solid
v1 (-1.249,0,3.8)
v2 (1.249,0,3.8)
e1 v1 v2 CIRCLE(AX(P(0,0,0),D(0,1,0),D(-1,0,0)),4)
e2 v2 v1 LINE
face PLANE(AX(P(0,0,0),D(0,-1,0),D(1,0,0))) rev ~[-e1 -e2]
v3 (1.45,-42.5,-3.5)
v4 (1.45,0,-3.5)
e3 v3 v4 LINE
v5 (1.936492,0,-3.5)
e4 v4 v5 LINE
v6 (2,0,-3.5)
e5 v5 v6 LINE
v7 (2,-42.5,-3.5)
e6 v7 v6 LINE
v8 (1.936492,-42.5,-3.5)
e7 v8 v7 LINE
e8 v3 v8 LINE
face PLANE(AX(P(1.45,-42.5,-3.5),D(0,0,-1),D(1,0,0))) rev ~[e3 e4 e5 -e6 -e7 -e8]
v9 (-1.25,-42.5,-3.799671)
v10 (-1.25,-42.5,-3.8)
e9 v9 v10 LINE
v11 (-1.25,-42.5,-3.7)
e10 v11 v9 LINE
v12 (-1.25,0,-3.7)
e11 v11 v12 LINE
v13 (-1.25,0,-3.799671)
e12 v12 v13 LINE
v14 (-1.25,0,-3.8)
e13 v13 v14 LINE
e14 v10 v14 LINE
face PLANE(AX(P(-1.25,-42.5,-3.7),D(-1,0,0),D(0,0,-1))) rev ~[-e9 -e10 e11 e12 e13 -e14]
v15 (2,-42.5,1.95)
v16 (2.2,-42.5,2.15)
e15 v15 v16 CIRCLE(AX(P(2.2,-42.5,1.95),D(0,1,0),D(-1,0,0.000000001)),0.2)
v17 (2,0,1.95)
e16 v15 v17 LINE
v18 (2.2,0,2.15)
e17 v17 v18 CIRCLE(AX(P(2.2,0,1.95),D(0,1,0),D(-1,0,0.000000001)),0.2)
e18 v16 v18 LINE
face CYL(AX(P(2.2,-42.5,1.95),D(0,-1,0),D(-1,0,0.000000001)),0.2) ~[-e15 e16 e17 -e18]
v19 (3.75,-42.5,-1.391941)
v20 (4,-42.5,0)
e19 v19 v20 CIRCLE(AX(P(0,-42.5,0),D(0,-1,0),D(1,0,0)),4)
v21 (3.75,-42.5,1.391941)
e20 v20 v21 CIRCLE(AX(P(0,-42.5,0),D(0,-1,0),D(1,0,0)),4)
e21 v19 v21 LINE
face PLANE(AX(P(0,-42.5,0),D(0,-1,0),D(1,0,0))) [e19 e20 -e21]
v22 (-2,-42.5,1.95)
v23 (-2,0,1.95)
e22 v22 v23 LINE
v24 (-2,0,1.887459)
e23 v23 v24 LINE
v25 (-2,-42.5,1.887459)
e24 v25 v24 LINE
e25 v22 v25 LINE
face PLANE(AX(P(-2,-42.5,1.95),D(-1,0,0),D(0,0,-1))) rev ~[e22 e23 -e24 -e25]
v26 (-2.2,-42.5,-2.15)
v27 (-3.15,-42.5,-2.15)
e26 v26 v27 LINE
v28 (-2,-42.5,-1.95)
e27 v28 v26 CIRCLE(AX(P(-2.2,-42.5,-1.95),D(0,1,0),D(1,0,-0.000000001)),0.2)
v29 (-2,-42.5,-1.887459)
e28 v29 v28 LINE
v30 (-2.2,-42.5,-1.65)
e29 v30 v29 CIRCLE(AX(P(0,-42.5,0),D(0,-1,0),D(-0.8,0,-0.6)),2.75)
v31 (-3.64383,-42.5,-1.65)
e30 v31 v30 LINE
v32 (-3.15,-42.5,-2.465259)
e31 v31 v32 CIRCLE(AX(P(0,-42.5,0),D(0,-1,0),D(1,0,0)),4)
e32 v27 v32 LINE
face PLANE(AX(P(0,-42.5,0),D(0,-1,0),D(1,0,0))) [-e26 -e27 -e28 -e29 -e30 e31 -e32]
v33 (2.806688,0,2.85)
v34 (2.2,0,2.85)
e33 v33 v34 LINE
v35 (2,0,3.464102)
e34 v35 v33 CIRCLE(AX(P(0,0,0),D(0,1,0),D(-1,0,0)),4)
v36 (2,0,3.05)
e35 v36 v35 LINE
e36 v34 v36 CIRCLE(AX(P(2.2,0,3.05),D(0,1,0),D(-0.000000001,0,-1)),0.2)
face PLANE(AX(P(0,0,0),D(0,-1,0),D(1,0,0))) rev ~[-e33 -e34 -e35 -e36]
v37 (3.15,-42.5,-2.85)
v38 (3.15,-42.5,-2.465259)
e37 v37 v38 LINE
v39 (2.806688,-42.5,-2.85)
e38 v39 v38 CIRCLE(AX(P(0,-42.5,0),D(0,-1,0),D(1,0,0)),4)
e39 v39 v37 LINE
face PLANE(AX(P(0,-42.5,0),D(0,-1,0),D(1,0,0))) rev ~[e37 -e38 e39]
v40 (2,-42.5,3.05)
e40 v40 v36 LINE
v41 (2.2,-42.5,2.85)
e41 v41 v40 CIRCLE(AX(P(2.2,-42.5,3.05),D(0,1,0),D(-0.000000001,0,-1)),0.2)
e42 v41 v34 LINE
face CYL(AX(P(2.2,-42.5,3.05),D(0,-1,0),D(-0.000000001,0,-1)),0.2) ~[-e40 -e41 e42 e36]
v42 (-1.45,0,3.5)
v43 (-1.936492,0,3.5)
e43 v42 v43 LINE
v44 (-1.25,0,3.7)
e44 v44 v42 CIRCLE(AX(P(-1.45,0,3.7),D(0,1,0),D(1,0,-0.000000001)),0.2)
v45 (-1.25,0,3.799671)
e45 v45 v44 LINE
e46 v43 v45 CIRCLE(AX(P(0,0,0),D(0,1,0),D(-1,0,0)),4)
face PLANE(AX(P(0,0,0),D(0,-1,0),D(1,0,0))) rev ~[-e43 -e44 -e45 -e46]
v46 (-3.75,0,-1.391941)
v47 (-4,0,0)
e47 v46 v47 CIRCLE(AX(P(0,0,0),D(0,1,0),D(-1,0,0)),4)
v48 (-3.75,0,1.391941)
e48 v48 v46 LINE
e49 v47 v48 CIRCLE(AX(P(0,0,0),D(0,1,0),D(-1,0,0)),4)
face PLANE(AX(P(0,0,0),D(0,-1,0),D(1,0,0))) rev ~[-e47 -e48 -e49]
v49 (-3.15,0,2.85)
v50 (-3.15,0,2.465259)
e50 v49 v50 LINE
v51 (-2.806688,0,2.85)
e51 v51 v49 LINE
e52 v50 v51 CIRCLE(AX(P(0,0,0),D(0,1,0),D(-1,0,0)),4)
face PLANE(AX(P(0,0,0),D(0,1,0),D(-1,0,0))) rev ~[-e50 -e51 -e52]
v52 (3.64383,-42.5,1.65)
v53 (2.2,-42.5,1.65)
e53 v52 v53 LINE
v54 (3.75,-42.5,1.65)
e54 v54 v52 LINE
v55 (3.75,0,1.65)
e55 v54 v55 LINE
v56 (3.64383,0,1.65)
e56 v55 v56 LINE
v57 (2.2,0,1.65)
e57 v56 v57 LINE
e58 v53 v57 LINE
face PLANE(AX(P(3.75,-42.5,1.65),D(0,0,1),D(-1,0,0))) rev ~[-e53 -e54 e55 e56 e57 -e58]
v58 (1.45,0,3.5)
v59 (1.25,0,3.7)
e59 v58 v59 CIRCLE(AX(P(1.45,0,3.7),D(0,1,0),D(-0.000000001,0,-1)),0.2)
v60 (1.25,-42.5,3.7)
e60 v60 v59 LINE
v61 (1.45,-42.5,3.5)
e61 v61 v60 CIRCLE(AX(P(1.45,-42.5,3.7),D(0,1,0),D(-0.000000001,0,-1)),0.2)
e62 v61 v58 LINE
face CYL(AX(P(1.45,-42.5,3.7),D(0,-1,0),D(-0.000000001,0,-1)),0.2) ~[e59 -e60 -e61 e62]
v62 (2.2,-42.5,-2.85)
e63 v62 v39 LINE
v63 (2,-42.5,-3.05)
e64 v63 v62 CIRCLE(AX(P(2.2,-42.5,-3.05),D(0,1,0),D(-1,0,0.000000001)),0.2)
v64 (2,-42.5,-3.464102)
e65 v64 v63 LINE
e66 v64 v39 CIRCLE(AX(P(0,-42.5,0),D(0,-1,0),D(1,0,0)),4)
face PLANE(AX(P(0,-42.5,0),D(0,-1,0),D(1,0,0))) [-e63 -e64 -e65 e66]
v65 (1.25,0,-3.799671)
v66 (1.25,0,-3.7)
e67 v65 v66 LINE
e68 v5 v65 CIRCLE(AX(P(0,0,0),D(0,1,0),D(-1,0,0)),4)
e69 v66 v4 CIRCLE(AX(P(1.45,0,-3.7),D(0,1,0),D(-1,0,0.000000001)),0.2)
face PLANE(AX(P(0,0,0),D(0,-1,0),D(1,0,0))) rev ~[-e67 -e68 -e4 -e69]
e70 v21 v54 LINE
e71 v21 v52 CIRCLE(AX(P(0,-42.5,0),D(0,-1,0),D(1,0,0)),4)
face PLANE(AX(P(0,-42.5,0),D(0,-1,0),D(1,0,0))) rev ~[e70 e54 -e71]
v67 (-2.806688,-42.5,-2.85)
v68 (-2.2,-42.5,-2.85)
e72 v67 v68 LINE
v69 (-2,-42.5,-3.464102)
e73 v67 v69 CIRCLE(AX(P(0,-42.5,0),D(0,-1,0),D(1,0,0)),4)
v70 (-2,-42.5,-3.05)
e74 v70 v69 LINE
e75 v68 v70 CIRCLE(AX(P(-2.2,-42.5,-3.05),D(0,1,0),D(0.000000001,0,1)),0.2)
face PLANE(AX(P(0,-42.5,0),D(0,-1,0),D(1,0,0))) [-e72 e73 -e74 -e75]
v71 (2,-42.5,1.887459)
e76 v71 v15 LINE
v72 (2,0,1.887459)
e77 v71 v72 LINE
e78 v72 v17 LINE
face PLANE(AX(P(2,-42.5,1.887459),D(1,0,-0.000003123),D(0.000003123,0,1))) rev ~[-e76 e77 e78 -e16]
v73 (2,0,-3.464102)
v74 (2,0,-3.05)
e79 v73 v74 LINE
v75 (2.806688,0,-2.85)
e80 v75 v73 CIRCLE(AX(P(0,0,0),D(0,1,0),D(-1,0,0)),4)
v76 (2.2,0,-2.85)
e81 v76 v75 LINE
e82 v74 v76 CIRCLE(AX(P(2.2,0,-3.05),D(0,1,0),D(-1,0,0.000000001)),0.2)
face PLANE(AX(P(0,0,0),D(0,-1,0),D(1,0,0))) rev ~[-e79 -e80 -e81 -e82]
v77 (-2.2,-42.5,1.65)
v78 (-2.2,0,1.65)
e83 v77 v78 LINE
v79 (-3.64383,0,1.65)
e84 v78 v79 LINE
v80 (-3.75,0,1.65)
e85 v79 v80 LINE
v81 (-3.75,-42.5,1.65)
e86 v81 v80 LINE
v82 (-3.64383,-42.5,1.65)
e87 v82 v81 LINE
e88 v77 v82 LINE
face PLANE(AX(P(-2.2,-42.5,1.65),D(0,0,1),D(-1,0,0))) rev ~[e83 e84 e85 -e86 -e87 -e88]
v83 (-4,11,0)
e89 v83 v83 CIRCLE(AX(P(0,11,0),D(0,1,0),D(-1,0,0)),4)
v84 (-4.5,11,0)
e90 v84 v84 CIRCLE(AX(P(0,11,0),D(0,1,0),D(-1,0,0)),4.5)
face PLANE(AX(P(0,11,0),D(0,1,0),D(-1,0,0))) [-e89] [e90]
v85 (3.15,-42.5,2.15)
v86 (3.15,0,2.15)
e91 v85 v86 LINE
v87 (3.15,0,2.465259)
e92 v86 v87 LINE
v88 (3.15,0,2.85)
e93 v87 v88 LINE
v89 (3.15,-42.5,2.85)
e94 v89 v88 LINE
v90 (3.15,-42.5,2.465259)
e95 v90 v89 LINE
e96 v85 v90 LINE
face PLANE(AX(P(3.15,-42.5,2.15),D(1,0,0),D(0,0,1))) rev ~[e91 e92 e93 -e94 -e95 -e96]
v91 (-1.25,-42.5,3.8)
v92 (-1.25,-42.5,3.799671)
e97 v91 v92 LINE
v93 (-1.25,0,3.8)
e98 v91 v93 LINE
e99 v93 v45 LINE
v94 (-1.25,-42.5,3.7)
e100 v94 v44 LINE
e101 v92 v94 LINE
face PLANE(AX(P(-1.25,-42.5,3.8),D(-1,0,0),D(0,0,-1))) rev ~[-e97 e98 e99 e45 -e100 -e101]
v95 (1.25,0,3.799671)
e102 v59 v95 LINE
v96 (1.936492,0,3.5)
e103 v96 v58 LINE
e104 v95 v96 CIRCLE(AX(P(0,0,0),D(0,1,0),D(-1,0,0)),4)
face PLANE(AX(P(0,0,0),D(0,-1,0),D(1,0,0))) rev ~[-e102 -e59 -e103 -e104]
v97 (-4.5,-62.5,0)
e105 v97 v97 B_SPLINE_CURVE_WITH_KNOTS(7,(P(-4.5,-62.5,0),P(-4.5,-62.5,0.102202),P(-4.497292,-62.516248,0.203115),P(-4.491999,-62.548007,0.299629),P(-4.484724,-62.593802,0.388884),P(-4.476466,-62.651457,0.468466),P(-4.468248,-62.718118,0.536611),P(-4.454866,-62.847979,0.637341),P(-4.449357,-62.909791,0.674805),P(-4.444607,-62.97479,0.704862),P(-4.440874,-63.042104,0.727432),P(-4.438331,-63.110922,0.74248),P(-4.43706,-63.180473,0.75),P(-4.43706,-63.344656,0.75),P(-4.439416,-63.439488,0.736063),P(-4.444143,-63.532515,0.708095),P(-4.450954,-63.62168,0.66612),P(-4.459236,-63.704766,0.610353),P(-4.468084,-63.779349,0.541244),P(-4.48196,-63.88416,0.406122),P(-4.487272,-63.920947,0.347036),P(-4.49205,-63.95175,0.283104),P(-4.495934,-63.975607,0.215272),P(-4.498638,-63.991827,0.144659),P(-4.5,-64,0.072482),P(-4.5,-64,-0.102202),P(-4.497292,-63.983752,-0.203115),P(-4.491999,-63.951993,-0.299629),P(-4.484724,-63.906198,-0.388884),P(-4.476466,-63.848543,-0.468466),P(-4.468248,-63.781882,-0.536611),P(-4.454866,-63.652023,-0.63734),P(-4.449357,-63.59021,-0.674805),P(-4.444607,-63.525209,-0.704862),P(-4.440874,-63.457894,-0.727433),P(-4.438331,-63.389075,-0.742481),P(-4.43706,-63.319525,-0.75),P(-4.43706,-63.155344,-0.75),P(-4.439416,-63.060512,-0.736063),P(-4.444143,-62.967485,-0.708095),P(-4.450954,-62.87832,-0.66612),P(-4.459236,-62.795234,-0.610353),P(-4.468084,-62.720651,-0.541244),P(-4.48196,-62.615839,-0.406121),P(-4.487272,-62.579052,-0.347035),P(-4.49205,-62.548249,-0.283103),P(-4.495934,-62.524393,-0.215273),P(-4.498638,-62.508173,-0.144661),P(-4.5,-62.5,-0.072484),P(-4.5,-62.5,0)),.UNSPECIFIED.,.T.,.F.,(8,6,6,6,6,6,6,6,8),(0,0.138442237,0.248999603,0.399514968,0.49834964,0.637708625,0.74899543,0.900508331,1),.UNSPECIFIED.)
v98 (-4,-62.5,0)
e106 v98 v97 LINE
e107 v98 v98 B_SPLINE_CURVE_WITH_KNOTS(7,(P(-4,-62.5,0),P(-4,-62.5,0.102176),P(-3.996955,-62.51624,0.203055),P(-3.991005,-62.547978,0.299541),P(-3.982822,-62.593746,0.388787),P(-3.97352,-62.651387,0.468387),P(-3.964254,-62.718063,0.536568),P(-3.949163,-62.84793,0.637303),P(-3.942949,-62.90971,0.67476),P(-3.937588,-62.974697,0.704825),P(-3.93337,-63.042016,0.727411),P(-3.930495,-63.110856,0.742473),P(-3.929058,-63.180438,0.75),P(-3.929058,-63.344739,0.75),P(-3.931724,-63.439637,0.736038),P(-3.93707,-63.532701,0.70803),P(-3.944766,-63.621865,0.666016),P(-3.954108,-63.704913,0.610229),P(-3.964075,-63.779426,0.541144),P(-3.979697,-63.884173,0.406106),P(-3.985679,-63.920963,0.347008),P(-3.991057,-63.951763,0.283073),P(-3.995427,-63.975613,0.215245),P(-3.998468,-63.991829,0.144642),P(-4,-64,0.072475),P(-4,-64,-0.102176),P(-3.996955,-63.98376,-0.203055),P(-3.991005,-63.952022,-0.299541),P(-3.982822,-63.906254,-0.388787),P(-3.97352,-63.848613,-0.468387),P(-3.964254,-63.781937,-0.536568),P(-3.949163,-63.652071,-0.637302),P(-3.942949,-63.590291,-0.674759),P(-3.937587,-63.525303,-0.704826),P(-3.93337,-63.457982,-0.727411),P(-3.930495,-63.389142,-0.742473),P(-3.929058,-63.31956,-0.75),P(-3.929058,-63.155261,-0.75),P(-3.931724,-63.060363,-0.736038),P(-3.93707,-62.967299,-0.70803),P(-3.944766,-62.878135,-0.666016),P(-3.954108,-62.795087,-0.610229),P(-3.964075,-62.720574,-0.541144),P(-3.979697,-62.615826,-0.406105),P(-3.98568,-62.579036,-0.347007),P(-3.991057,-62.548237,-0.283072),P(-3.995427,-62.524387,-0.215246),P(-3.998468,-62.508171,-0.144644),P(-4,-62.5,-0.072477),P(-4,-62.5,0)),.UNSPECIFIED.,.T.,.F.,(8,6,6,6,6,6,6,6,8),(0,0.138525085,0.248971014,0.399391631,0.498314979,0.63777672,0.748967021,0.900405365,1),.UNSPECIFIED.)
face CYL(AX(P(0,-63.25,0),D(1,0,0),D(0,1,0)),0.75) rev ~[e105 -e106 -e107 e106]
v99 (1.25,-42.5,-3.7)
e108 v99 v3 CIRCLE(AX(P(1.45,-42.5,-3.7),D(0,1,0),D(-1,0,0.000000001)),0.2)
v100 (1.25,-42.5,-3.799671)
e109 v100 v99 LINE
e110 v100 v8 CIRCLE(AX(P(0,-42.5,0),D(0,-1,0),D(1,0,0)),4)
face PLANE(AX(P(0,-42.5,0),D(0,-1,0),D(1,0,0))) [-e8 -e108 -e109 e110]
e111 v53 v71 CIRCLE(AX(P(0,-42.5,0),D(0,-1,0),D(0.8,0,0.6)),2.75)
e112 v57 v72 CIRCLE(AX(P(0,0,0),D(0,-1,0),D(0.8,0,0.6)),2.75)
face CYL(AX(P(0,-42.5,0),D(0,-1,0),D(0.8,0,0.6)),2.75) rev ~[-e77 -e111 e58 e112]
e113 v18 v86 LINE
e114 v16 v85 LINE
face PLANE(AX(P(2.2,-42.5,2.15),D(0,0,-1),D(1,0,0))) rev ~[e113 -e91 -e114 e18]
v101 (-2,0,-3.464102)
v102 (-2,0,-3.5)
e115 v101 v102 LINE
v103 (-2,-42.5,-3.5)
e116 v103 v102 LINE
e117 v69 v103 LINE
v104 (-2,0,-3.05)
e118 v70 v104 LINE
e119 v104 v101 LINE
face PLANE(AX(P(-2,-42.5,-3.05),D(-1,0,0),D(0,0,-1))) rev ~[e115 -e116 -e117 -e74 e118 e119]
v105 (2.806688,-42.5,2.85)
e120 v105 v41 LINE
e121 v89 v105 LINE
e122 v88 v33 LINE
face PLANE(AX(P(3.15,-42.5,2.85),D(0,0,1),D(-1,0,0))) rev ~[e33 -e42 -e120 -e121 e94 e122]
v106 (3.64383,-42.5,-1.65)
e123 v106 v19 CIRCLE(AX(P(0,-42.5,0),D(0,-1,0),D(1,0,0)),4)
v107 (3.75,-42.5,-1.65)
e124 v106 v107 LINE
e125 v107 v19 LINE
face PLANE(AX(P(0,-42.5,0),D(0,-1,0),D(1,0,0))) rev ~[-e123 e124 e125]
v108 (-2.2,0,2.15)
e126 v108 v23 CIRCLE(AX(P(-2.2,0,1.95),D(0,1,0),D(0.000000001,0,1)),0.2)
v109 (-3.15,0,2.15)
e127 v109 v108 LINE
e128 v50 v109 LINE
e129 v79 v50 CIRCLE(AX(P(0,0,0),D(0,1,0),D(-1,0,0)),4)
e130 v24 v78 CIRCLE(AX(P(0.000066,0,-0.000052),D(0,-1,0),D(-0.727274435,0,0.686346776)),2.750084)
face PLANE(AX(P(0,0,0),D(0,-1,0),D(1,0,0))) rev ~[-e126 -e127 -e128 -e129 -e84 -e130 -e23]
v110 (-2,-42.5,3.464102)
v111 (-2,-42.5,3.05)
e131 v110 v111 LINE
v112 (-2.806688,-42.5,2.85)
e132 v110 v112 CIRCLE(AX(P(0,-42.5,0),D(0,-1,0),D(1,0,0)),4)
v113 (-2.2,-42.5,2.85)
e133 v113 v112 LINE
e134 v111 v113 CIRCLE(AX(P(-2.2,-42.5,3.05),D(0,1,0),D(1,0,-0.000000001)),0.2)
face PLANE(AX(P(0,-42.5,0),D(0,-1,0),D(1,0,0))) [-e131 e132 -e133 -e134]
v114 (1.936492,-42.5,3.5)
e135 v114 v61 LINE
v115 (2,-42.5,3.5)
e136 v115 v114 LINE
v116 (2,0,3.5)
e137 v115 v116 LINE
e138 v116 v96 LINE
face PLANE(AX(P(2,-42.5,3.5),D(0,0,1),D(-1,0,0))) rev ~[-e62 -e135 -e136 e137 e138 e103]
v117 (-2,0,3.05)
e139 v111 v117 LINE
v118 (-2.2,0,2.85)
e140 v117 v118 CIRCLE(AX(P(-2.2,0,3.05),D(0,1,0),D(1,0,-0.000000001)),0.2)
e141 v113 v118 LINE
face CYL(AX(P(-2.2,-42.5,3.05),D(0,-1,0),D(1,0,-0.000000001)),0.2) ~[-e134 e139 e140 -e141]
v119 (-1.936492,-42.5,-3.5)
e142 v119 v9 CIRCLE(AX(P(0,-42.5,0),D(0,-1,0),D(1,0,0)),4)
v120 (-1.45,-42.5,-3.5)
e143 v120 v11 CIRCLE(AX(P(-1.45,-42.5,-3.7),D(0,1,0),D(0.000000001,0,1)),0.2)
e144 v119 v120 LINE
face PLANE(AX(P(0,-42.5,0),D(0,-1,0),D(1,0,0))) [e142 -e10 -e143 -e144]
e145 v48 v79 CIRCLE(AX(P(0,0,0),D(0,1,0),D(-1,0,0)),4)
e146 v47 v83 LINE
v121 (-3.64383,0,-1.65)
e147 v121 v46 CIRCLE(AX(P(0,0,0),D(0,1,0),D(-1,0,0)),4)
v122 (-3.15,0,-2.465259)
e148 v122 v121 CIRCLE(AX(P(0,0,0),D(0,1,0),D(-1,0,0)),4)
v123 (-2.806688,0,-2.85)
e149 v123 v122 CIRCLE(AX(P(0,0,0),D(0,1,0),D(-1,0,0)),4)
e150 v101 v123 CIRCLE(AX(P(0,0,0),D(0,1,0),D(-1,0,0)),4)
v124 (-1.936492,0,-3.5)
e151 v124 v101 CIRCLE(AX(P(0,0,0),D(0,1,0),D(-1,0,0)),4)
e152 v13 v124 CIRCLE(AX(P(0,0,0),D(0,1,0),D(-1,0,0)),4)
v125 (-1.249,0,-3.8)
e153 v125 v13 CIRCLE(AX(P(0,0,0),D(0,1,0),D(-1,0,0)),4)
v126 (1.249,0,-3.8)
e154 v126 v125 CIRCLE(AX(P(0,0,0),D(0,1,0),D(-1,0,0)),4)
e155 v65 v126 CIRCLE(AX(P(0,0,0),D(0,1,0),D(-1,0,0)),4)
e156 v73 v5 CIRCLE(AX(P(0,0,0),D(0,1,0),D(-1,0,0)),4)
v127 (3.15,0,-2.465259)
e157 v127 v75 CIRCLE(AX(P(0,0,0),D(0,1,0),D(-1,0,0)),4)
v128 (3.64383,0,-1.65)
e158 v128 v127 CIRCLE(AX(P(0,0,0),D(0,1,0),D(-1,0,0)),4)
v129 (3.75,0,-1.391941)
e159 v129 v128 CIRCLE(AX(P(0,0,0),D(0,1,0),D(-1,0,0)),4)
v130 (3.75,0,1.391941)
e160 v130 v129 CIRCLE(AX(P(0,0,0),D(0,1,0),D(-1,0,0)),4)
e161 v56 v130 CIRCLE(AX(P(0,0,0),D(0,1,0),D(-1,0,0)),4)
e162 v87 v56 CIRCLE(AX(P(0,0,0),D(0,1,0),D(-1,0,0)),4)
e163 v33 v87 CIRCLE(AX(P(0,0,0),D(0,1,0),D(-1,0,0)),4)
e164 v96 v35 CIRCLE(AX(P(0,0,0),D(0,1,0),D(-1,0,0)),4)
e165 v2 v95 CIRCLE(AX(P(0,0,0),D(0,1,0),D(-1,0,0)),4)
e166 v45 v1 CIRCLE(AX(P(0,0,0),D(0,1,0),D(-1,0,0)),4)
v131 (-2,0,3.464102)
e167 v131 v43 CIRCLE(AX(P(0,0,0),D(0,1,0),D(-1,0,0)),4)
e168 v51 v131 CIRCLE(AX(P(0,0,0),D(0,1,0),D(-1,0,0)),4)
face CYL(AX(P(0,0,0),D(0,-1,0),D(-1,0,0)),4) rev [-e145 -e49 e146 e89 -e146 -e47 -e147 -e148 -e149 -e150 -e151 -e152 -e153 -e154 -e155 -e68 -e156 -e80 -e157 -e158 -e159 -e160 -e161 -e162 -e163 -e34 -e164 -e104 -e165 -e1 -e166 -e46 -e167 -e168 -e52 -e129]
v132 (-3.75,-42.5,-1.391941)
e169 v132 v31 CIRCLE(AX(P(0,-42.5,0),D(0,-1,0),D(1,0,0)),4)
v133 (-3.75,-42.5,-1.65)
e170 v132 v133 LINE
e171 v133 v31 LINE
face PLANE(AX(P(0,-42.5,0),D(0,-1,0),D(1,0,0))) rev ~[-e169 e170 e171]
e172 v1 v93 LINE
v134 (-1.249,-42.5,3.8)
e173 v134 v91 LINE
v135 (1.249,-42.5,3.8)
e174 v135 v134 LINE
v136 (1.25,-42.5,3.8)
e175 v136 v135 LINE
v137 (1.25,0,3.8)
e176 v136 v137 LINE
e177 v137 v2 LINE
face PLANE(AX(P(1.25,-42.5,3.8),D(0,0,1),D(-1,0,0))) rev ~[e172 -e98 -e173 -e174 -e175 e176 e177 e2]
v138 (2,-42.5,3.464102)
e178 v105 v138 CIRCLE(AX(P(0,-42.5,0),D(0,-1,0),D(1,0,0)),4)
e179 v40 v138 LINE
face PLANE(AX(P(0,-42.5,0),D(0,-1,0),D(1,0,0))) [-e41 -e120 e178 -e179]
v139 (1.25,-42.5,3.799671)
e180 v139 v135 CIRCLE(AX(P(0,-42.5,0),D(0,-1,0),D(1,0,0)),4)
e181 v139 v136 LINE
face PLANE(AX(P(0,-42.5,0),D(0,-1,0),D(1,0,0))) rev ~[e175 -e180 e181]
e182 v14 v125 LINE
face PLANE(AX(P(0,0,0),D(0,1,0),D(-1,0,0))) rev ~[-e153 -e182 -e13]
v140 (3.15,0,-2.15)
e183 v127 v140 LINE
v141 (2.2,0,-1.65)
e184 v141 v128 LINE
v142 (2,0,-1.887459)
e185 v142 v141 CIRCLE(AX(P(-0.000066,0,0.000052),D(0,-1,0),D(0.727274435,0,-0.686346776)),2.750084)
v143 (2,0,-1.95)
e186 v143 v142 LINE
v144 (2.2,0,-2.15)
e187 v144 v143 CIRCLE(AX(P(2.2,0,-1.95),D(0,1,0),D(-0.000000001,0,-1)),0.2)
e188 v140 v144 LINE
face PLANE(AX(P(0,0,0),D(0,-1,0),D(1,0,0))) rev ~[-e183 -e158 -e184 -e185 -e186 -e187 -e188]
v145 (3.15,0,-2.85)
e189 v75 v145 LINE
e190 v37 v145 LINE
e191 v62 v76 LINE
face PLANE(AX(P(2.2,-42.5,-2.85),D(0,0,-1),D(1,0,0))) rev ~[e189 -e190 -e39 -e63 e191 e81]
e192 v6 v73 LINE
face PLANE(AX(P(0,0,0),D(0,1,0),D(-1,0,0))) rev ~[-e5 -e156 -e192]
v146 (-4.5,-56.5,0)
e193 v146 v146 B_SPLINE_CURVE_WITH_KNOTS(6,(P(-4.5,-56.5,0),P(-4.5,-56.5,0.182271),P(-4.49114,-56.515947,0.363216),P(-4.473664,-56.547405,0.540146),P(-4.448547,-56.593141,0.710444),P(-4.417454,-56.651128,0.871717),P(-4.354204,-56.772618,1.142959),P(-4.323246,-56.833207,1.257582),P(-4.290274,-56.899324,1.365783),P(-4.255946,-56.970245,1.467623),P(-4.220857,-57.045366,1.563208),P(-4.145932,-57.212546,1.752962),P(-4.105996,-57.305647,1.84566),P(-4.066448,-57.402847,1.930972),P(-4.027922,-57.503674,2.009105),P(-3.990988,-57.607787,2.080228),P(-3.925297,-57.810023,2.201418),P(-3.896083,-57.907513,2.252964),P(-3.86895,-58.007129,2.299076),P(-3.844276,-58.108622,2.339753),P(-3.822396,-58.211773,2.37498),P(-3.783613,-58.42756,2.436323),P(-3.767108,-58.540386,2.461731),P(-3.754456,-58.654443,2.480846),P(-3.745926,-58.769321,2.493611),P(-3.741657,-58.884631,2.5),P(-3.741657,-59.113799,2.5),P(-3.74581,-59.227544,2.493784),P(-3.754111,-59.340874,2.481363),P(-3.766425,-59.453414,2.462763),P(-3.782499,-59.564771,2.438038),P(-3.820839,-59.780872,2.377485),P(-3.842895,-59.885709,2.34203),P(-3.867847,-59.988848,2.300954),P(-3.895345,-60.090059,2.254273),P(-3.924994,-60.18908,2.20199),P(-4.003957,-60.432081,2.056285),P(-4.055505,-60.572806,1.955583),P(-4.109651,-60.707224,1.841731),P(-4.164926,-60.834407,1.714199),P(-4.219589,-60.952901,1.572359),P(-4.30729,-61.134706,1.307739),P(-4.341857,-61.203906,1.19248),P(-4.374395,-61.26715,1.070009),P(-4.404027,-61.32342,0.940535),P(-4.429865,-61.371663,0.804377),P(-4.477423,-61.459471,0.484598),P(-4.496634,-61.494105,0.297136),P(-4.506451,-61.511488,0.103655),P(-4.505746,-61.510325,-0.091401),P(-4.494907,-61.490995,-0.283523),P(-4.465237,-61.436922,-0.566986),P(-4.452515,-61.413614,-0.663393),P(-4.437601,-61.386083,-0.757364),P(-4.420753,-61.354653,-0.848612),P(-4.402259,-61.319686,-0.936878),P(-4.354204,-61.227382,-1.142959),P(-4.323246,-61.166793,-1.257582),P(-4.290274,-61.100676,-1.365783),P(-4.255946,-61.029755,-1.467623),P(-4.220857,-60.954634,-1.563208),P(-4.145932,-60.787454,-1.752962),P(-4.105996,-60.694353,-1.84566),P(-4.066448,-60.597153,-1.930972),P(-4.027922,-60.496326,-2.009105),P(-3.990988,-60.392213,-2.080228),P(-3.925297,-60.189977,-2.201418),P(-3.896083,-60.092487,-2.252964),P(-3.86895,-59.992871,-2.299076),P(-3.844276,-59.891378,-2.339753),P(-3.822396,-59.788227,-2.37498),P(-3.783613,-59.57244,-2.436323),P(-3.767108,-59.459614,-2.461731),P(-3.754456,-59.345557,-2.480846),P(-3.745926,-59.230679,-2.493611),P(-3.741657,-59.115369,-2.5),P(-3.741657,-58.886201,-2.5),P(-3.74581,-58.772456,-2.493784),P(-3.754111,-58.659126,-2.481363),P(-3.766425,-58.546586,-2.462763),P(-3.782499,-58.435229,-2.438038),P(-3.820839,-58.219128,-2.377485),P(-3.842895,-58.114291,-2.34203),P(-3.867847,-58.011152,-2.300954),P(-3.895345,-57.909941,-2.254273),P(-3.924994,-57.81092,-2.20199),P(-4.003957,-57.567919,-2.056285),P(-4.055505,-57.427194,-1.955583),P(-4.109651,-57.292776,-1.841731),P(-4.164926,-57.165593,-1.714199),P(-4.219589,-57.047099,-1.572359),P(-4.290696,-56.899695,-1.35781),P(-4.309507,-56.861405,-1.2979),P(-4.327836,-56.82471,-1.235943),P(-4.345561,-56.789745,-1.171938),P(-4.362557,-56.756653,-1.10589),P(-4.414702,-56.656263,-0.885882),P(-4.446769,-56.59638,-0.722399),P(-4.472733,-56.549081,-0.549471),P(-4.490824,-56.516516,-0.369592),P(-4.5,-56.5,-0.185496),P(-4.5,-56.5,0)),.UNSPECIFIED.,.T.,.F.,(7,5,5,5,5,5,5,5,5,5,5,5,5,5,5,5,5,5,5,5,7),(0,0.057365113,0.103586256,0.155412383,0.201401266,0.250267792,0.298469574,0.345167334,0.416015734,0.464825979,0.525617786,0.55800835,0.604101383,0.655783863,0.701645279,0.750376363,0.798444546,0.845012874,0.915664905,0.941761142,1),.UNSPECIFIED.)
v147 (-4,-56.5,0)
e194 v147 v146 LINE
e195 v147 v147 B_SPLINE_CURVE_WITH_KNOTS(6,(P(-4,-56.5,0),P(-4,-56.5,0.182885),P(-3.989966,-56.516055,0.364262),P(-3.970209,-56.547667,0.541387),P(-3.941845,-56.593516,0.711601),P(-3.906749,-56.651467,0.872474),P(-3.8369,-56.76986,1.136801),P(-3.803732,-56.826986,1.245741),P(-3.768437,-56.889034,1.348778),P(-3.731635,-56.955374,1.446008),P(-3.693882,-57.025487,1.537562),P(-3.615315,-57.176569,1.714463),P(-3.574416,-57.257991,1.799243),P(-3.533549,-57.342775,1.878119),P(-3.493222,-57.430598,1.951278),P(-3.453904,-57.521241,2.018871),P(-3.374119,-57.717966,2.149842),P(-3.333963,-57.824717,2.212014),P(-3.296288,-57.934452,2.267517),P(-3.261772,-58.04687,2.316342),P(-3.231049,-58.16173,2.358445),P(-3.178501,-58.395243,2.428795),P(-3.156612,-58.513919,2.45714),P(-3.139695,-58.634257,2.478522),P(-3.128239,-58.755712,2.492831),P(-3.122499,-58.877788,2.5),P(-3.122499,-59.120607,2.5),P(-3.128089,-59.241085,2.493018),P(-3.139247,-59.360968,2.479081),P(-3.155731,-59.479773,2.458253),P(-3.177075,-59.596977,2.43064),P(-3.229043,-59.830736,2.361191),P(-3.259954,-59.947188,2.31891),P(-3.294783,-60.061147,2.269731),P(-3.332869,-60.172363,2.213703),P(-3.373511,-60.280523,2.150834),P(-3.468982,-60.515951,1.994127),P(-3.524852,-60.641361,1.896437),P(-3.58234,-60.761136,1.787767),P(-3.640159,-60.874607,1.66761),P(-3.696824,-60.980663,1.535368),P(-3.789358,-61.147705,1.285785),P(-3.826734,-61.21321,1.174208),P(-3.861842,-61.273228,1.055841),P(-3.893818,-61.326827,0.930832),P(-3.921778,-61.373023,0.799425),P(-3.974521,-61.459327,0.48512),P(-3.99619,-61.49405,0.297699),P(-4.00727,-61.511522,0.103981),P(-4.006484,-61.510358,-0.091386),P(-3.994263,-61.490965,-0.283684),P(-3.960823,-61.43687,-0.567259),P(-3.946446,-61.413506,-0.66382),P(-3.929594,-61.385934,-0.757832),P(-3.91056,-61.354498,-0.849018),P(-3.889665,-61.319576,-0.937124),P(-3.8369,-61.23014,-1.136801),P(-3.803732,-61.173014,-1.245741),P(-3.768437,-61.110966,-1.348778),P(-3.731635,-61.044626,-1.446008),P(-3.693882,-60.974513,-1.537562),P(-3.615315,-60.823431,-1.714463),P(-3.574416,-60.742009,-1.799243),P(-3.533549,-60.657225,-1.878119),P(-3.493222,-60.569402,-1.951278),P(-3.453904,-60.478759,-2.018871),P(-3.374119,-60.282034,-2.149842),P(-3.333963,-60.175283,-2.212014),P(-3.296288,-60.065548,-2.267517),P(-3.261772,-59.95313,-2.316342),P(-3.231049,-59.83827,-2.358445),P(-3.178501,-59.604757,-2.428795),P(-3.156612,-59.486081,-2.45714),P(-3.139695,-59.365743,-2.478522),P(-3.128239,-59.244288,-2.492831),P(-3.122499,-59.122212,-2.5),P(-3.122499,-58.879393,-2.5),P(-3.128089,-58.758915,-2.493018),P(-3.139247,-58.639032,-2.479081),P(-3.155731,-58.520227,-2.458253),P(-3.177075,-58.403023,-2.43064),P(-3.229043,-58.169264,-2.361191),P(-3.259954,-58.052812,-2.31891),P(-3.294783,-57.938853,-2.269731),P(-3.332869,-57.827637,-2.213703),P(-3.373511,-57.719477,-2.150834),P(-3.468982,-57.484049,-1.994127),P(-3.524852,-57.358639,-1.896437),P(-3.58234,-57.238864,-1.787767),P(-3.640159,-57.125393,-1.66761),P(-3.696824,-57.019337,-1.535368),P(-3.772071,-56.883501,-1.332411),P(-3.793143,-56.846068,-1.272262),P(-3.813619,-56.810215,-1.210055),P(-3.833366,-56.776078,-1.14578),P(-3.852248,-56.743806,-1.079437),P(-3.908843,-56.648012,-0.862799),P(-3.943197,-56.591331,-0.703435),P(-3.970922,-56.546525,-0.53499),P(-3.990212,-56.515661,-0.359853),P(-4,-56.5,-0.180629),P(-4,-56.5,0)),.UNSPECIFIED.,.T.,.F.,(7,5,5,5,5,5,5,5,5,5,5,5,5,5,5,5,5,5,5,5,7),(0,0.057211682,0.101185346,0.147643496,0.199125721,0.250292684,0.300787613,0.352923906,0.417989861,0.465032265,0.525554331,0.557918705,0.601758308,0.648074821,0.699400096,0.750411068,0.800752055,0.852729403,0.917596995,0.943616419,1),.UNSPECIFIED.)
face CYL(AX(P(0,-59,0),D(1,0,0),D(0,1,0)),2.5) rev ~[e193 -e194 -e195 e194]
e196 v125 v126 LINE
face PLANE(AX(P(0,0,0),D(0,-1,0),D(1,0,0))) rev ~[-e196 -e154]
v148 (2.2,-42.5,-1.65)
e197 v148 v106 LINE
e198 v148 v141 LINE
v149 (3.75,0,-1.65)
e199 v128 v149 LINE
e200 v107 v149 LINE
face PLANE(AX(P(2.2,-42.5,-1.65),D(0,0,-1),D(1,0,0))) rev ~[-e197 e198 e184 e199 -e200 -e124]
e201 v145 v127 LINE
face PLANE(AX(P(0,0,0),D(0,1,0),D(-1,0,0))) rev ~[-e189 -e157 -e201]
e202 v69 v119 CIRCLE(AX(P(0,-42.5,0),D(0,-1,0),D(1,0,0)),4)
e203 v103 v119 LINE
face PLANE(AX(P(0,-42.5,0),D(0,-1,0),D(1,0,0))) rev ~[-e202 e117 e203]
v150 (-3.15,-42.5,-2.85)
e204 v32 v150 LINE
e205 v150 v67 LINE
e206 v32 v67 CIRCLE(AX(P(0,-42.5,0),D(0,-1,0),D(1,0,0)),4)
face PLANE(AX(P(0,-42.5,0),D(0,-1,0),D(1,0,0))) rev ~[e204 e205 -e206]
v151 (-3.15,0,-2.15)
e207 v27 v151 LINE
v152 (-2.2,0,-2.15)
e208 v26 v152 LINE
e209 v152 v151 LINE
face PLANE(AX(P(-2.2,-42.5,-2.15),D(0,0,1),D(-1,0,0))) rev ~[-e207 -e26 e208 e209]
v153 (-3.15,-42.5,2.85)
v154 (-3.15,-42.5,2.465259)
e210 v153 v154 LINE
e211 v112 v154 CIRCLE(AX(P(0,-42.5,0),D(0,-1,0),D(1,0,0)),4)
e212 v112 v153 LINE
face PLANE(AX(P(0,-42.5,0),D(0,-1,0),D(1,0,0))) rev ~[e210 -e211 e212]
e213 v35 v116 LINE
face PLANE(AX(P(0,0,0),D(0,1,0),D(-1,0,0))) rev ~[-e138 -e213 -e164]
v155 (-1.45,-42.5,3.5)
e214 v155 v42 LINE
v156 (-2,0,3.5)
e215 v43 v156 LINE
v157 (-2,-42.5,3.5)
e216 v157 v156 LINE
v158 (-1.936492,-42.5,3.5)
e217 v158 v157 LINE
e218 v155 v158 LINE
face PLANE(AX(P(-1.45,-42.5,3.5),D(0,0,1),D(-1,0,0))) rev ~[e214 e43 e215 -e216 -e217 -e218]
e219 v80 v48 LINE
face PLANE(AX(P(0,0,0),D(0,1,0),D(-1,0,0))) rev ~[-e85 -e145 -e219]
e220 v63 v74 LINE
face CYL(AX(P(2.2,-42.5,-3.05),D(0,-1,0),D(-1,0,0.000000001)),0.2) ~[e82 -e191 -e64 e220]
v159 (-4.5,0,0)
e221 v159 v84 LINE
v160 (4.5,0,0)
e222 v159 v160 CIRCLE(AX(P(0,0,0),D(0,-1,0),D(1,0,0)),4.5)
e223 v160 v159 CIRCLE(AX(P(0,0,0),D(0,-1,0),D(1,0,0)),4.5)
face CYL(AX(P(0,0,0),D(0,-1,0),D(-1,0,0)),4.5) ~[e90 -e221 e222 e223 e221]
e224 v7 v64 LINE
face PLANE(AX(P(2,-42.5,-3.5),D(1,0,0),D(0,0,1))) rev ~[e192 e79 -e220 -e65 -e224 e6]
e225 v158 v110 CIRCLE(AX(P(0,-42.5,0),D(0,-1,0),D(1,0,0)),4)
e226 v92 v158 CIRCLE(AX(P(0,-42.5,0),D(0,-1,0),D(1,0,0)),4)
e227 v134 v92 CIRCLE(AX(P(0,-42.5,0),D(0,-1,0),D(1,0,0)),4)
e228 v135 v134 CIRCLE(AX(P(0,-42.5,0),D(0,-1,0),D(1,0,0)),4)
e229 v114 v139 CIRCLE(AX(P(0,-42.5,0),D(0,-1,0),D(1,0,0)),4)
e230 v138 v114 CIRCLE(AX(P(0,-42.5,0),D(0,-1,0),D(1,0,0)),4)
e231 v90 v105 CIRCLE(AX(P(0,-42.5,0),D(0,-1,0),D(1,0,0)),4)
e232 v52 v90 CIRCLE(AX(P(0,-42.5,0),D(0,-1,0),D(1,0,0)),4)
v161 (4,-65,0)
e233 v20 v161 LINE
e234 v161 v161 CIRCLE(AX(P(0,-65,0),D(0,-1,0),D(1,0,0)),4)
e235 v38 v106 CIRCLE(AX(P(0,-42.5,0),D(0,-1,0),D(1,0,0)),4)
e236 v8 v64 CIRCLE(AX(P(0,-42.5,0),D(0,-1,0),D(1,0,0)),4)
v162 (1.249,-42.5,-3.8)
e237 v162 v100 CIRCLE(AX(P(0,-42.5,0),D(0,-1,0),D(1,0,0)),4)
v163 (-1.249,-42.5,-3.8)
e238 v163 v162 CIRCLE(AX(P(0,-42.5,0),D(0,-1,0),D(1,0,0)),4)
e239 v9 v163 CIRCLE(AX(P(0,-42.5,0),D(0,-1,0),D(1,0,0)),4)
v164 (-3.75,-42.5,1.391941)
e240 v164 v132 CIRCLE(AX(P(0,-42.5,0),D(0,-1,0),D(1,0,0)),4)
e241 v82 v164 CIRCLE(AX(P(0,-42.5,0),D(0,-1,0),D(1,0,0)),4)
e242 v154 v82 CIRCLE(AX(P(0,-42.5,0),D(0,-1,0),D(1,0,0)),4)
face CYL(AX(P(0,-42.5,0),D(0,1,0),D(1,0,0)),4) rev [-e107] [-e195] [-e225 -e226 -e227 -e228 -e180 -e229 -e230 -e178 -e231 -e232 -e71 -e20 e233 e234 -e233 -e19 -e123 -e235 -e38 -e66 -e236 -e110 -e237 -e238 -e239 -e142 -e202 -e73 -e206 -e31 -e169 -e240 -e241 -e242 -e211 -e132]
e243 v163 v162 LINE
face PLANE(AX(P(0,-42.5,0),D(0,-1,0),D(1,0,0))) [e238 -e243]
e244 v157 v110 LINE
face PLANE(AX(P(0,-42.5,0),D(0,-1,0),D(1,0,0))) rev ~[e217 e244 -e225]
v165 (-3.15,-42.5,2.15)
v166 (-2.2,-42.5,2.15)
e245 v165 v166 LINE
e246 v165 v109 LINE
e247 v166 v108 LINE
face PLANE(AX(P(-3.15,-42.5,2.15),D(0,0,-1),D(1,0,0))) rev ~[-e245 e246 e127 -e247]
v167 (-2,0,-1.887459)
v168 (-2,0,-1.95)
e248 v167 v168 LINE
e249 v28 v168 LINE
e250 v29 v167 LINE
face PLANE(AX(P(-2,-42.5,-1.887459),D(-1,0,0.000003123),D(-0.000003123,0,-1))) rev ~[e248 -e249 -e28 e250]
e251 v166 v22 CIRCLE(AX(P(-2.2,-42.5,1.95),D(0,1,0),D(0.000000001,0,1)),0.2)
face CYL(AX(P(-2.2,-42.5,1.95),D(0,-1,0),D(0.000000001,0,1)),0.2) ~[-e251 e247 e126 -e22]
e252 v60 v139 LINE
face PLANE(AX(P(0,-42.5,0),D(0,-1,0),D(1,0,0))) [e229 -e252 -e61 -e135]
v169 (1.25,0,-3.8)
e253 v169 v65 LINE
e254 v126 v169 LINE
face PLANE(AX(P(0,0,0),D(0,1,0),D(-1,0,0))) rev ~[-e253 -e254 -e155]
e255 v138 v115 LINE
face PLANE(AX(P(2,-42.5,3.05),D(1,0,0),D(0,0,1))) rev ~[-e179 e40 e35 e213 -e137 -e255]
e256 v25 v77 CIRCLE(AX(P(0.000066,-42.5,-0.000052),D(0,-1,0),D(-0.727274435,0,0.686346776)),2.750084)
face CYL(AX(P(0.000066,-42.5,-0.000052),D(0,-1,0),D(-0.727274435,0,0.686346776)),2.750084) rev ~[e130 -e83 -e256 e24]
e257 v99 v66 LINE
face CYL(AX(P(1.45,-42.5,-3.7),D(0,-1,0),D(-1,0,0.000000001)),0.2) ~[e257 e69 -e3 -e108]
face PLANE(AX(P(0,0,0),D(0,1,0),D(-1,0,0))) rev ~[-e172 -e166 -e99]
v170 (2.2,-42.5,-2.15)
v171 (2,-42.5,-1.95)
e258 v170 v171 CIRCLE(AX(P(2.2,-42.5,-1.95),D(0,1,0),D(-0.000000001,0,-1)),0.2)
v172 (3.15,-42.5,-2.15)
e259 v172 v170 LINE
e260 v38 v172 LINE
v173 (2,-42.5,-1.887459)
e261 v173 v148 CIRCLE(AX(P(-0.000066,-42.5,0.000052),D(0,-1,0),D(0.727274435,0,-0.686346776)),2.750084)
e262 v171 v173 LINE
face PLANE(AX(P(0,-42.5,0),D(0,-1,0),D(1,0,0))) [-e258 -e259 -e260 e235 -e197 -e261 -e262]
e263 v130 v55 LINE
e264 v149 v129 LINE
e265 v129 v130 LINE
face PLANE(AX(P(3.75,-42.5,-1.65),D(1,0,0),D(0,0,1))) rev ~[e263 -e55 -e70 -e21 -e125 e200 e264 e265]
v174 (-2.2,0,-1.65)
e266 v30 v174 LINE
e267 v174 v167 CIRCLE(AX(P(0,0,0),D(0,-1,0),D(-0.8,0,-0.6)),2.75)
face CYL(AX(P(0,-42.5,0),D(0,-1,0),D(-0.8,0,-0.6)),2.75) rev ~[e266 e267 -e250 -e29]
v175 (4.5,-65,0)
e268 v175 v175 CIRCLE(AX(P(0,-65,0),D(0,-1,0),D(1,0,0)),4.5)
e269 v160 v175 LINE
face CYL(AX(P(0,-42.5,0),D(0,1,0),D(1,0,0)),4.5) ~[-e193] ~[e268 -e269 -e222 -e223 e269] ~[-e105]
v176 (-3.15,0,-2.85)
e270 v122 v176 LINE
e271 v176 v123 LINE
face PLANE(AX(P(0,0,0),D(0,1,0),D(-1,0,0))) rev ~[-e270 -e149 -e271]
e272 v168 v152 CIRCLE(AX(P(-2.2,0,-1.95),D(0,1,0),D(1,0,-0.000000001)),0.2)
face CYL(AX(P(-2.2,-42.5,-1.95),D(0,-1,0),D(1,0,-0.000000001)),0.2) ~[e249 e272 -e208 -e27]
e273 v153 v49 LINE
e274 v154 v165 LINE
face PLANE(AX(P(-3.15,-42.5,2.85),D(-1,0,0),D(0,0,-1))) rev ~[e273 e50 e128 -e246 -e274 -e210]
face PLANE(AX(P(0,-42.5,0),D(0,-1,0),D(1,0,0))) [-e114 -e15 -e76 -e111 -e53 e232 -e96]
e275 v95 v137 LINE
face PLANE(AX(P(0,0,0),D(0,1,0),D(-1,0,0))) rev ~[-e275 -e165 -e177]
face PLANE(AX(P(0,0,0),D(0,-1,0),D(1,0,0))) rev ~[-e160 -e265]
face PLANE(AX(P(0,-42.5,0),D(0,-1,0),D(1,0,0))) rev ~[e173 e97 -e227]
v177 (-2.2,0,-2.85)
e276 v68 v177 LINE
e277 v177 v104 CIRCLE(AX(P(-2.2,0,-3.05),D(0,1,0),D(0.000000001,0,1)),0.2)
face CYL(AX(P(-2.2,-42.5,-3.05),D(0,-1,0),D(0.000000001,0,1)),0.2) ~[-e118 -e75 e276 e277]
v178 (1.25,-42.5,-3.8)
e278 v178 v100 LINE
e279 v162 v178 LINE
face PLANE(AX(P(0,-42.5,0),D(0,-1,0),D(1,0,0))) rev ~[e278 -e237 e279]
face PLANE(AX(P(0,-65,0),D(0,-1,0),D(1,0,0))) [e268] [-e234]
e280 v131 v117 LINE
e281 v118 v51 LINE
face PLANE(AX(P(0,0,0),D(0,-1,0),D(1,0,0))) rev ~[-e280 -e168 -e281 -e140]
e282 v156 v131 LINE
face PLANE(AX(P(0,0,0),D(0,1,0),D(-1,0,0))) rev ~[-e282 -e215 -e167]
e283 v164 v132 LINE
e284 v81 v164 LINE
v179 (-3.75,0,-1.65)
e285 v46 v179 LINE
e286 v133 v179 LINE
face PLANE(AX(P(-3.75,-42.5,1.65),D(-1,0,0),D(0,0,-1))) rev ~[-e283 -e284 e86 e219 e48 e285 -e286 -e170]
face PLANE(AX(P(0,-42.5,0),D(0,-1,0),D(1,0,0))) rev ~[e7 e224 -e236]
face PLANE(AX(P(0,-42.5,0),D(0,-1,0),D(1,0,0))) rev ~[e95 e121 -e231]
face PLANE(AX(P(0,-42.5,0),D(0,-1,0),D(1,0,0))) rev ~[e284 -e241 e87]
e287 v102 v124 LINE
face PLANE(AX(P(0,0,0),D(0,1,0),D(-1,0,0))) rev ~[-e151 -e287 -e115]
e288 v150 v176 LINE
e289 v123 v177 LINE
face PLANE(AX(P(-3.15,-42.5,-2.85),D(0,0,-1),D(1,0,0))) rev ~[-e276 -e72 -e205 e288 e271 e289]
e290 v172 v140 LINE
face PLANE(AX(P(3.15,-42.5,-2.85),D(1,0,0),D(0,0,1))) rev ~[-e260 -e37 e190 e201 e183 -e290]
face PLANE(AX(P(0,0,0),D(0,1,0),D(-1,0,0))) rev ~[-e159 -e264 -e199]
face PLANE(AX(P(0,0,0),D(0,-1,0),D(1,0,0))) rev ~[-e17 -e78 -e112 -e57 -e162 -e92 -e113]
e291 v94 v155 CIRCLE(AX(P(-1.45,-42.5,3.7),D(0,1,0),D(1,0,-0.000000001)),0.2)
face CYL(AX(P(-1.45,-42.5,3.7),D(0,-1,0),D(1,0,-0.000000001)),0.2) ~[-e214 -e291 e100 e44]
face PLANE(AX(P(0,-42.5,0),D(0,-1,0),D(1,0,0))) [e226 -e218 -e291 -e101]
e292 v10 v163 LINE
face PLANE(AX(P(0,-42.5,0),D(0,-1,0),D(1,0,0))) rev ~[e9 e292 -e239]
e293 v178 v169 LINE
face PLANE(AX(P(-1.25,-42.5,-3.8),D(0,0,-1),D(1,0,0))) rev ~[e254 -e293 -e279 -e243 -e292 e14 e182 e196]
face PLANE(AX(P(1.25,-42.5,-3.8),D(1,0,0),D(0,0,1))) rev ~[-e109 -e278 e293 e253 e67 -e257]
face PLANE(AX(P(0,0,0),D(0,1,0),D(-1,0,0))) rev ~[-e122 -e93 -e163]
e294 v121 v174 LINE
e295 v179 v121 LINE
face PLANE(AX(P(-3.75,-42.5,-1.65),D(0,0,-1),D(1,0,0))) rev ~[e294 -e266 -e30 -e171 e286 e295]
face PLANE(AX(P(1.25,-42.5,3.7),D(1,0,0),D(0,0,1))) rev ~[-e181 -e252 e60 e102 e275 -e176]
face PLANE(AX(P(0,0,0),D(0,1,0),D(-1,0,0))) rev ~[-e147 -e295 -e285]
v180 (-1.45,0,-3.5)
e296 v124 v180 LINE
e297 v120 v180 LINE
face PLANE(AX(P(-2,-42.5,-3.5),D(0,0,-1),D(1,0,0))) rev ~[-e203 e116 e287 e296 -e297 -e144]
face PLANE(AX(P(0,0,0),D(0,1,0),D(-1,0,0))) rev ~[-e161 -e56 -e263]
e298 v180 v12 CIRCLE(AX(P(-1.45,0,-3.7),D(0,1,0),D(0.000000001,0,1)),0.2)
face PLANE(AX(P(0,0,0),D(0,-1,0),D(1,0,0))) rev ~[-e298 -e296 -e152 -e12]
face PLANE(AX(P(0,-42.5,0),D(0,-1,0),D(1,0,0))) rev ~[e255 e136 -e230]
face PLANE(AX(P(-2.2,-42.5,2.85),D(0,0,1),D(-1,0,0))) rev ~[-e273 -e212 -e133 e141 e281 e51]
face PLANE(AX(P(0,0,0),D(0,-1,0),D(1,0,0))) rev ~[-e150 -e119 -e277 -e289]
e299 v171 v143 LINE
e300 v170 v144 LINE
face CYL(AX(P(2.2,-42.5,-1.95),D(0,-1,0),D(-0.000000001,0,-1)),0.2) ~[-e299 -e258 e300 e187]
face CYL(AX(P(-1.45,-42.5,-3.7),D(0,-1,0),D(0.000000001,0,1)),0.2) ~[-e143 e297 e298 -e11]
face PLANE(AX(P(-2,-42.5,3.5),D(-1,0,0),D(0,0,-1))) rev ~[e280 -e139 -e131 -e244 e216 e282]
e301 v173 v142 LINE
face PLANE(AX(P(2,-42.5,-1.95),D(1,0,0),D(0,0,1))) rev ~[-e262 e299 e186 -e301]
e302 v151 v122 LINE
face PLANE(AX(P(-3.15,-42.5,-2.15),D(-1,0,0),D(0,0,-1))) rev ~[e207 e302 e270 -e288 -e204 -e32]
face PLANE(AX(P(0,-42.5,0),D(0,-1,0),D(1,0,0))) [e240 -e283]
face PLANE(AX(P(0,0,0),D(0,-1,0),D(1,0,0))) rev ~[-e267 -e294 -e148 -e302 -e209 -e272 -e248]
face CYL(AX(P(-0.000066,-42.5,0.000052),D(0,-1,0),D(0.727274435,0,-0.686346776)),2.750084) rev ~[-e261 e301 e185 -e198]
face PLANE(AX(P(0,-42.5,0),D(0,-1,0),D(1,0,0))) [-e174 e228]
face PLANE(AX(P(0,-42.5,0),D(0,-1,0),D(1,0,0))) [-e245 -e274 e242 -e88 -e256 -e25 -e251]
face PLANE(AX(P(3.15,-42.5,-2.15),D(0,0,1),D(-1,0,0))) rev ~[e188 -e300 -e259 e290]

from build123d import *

# Parameters (mm, degrees)
F3_R      = 4.5
F4_DEPTH  = 42.5
F8_DEPTH  = 42.5
F6_R      = 4.5
F6_R_2    = 4
F9_DEPTH  = 22.5
F7_R      = 4.5
F7_R_2    = 4
F10_DEPTH = 11
F11_R     = 2.5
F11_R_2   = 0.75
F12_DEPTH = 4.501


# Not quite as in the source:
# - ends of sketch curves that miss each other by under 0.0002 mm in the source are joined


with BuildPart() as f4:
    # F3 (on Front) → F4 (new body)
    with BuildSketch(Plane.XZ):
        Circle(F3_R)
    extrude(amount=F4_DEPTH)

    # F5 (on face) → F8 (cut, through all)
    with BuildSketch(Plane.XZ.offset(42.5)):
        with BuildLine():
            Line((-1.25, -3.8), (0, -3.8))
            Line((0, -3.8), (1.25, -3.8))
            Line((1.25, -3.8), (1.25, -3.7))
            ThreePointArc((1.25, -3.7), (1.3085786438, -3.5585786438), (1.45, -3.5))
            Line((1.45, -3.5), (2, -3.5))
            Line((2, -3.5), (2, -3.05))
            ThreePointArc((2, -3.05), (2.0585786438, -2.9085786438), (2.2, -2.85))
            Line((2.2, -2.85), (3.15, -2.85))
            Line((3.15, -2.85), (3.15, -2.15))
            Line((3.15, -2.15), (2.2, -2.15))
            ThreePointArc((2.2, -2.15), (2.0585786438, -2.0914213562), (2, -1.95))
            Line((2, -1.95), (2, -1.887459))
            ThreePointArc((2, -1.887459), (2.1033535752, -1.771554046), (2.2, -1.65))
            Line((2.2, -1.65), (3.75, -1.65))
            Line((3.75, -1.65), (3.75, 0))
            Line((3.75, 0), (3.75, 1.65))
            Line((3.75, 1.65), (2.2, 1.65))
            ThreePointArc((2.2, 1.65), (2.1033535752, 1.771554046), (1.9999998047, 1.8874588157))
            Line((1.9999998047, 1.8874588157), (2, 1.95))
            ThreePointArc((2, 1.95), (2.0585786438, 2.0914213562), (2.2, 2.15))
            Line((2.2, 2.15), (3.15, 2.15))
            Line((3.15, 2.15), (3.15, 2.85))
            Line((3.15, 2.85), (2.2, 2.85))
            ThreePointArc((2.2, 2.85), (2.0585786438, 2.9085786438), (2, 3.05))
            Line((2, 3.05), (2, 3.5))
            Line((2, 3.5), (1.45, 3.5))
            ThreePointArc((1.45, 3.5), (1.3085786438, 3.5585786438), (1.25, 3.7))
            Line((1.25, 3.7), (1.25, 3.8))
            Line((1.25, 3.8), (0, 3.8))
            Line((0, 3.8), (-1.25, 3.8))
            Line((-1.25, 3.8), (-1.25, 3.7))
            ThreePointArc((-1.25, 3.7), (-1.3085786438, 3.5585786438), (-1.45, 3.5))
            Line((-1.45, 3.5), (-2, 3.5))
            Line((-2, 3.5), (-2, 3.05))
            ThreePointArc((-2, 3.05), (-2.0585786438, 2.9085786438), (-2.2, 2.85))
            Line((-2.2, 2.85), (-3.15, 2.85))
            Line((-3.15, 2.85), (-3.15, 2.15))
            Line((-3.15, 2.15), (-2.2, 2.15))
            ThreePointArc((-2.2, 2.15), (-2.0585786438, 2.0914213562), (-2, 1.95))
            Line((-2, 1.95), (-2, 1.887459))
            ThreePointArc((-2, 1.887459), (-2.1033535752, 1.771554046), (-2.2, 1.65))
            Line((-2.2, 1.65), (-3.75, 1.65))
            Line((-3.75, 1.65), (-3.75, 0))
            Line((-3.75, 0), (-3.75, -1.65))
            Line((-3.75, -1.65), (-2.2, -1.65))
            ThreePointArc((-2.2, -1.65), (-2.1033535752, -1.771554046), (-1.9999998047, -1.8874588157))
            Line((-1.9999998047, -1.8874588157), (-2, -1.95))
            ThreePointArc((-2, -1.95), (-2.0585786438, -2.0914213562), (-2.2, -2.15))
            Line((-2.2, -2.15), (-3.15, -2.15))
            Line((-3.15, -2.15), (-3.15, -2.85))
            Line((-3.15, -2.85), (-2.2, -2.85))
            ThreePointArc((-2.2, -2.85), (-2.0585786438, -2.9085786438), (-2, -3.05))
            Line((-2, -3.05), (-2, -3.5))
            Line((-2, -3.5), (-1.45, -3.5))
            ThreePointArc((-1.45, -3.5), (-1.3085786438, -3.5585786438), (-1.25, -3.7))
            Line((-1.25, -3.7), (-1.25, -3.8))
        make_face()
    extrude(amount=-F8_DEPTH, mode=Mode.SUBTRACT)

    # F6 (on face) → F9 (join)
    with BuildSketch(Plane.XZ.offset(42.5)):
        Circle(F6_R)
        Circle(F6_R_2, mode=Mode.SUBTRACT)
    extrude(amount=F9_DEPTH)

    # F7 (on face) → F10 (join)
    with BuildSketch(Plane(origin=(0, 0, 0), x_dir=(-1, 0, 0), z_dir=(0, 1, 0))):
        Circle(F7_R)
        Circle(F7_R_2, mode=Mode.SUBTRACT)
    extrude(amount=F10_DEPTH)

    # F11 (on Right) → F12 (cut, through all)
    with BuildSketch(Plane.YZ):
        with Locations((-59, 0)):
            Circle(F11_R)
        with Locations((-63.25, 0)):
            Circle(F11_R_2)
    extrude(amount=-F12_DEPTH, mode=Mode.SUBTRACT)


solid = f4.part
